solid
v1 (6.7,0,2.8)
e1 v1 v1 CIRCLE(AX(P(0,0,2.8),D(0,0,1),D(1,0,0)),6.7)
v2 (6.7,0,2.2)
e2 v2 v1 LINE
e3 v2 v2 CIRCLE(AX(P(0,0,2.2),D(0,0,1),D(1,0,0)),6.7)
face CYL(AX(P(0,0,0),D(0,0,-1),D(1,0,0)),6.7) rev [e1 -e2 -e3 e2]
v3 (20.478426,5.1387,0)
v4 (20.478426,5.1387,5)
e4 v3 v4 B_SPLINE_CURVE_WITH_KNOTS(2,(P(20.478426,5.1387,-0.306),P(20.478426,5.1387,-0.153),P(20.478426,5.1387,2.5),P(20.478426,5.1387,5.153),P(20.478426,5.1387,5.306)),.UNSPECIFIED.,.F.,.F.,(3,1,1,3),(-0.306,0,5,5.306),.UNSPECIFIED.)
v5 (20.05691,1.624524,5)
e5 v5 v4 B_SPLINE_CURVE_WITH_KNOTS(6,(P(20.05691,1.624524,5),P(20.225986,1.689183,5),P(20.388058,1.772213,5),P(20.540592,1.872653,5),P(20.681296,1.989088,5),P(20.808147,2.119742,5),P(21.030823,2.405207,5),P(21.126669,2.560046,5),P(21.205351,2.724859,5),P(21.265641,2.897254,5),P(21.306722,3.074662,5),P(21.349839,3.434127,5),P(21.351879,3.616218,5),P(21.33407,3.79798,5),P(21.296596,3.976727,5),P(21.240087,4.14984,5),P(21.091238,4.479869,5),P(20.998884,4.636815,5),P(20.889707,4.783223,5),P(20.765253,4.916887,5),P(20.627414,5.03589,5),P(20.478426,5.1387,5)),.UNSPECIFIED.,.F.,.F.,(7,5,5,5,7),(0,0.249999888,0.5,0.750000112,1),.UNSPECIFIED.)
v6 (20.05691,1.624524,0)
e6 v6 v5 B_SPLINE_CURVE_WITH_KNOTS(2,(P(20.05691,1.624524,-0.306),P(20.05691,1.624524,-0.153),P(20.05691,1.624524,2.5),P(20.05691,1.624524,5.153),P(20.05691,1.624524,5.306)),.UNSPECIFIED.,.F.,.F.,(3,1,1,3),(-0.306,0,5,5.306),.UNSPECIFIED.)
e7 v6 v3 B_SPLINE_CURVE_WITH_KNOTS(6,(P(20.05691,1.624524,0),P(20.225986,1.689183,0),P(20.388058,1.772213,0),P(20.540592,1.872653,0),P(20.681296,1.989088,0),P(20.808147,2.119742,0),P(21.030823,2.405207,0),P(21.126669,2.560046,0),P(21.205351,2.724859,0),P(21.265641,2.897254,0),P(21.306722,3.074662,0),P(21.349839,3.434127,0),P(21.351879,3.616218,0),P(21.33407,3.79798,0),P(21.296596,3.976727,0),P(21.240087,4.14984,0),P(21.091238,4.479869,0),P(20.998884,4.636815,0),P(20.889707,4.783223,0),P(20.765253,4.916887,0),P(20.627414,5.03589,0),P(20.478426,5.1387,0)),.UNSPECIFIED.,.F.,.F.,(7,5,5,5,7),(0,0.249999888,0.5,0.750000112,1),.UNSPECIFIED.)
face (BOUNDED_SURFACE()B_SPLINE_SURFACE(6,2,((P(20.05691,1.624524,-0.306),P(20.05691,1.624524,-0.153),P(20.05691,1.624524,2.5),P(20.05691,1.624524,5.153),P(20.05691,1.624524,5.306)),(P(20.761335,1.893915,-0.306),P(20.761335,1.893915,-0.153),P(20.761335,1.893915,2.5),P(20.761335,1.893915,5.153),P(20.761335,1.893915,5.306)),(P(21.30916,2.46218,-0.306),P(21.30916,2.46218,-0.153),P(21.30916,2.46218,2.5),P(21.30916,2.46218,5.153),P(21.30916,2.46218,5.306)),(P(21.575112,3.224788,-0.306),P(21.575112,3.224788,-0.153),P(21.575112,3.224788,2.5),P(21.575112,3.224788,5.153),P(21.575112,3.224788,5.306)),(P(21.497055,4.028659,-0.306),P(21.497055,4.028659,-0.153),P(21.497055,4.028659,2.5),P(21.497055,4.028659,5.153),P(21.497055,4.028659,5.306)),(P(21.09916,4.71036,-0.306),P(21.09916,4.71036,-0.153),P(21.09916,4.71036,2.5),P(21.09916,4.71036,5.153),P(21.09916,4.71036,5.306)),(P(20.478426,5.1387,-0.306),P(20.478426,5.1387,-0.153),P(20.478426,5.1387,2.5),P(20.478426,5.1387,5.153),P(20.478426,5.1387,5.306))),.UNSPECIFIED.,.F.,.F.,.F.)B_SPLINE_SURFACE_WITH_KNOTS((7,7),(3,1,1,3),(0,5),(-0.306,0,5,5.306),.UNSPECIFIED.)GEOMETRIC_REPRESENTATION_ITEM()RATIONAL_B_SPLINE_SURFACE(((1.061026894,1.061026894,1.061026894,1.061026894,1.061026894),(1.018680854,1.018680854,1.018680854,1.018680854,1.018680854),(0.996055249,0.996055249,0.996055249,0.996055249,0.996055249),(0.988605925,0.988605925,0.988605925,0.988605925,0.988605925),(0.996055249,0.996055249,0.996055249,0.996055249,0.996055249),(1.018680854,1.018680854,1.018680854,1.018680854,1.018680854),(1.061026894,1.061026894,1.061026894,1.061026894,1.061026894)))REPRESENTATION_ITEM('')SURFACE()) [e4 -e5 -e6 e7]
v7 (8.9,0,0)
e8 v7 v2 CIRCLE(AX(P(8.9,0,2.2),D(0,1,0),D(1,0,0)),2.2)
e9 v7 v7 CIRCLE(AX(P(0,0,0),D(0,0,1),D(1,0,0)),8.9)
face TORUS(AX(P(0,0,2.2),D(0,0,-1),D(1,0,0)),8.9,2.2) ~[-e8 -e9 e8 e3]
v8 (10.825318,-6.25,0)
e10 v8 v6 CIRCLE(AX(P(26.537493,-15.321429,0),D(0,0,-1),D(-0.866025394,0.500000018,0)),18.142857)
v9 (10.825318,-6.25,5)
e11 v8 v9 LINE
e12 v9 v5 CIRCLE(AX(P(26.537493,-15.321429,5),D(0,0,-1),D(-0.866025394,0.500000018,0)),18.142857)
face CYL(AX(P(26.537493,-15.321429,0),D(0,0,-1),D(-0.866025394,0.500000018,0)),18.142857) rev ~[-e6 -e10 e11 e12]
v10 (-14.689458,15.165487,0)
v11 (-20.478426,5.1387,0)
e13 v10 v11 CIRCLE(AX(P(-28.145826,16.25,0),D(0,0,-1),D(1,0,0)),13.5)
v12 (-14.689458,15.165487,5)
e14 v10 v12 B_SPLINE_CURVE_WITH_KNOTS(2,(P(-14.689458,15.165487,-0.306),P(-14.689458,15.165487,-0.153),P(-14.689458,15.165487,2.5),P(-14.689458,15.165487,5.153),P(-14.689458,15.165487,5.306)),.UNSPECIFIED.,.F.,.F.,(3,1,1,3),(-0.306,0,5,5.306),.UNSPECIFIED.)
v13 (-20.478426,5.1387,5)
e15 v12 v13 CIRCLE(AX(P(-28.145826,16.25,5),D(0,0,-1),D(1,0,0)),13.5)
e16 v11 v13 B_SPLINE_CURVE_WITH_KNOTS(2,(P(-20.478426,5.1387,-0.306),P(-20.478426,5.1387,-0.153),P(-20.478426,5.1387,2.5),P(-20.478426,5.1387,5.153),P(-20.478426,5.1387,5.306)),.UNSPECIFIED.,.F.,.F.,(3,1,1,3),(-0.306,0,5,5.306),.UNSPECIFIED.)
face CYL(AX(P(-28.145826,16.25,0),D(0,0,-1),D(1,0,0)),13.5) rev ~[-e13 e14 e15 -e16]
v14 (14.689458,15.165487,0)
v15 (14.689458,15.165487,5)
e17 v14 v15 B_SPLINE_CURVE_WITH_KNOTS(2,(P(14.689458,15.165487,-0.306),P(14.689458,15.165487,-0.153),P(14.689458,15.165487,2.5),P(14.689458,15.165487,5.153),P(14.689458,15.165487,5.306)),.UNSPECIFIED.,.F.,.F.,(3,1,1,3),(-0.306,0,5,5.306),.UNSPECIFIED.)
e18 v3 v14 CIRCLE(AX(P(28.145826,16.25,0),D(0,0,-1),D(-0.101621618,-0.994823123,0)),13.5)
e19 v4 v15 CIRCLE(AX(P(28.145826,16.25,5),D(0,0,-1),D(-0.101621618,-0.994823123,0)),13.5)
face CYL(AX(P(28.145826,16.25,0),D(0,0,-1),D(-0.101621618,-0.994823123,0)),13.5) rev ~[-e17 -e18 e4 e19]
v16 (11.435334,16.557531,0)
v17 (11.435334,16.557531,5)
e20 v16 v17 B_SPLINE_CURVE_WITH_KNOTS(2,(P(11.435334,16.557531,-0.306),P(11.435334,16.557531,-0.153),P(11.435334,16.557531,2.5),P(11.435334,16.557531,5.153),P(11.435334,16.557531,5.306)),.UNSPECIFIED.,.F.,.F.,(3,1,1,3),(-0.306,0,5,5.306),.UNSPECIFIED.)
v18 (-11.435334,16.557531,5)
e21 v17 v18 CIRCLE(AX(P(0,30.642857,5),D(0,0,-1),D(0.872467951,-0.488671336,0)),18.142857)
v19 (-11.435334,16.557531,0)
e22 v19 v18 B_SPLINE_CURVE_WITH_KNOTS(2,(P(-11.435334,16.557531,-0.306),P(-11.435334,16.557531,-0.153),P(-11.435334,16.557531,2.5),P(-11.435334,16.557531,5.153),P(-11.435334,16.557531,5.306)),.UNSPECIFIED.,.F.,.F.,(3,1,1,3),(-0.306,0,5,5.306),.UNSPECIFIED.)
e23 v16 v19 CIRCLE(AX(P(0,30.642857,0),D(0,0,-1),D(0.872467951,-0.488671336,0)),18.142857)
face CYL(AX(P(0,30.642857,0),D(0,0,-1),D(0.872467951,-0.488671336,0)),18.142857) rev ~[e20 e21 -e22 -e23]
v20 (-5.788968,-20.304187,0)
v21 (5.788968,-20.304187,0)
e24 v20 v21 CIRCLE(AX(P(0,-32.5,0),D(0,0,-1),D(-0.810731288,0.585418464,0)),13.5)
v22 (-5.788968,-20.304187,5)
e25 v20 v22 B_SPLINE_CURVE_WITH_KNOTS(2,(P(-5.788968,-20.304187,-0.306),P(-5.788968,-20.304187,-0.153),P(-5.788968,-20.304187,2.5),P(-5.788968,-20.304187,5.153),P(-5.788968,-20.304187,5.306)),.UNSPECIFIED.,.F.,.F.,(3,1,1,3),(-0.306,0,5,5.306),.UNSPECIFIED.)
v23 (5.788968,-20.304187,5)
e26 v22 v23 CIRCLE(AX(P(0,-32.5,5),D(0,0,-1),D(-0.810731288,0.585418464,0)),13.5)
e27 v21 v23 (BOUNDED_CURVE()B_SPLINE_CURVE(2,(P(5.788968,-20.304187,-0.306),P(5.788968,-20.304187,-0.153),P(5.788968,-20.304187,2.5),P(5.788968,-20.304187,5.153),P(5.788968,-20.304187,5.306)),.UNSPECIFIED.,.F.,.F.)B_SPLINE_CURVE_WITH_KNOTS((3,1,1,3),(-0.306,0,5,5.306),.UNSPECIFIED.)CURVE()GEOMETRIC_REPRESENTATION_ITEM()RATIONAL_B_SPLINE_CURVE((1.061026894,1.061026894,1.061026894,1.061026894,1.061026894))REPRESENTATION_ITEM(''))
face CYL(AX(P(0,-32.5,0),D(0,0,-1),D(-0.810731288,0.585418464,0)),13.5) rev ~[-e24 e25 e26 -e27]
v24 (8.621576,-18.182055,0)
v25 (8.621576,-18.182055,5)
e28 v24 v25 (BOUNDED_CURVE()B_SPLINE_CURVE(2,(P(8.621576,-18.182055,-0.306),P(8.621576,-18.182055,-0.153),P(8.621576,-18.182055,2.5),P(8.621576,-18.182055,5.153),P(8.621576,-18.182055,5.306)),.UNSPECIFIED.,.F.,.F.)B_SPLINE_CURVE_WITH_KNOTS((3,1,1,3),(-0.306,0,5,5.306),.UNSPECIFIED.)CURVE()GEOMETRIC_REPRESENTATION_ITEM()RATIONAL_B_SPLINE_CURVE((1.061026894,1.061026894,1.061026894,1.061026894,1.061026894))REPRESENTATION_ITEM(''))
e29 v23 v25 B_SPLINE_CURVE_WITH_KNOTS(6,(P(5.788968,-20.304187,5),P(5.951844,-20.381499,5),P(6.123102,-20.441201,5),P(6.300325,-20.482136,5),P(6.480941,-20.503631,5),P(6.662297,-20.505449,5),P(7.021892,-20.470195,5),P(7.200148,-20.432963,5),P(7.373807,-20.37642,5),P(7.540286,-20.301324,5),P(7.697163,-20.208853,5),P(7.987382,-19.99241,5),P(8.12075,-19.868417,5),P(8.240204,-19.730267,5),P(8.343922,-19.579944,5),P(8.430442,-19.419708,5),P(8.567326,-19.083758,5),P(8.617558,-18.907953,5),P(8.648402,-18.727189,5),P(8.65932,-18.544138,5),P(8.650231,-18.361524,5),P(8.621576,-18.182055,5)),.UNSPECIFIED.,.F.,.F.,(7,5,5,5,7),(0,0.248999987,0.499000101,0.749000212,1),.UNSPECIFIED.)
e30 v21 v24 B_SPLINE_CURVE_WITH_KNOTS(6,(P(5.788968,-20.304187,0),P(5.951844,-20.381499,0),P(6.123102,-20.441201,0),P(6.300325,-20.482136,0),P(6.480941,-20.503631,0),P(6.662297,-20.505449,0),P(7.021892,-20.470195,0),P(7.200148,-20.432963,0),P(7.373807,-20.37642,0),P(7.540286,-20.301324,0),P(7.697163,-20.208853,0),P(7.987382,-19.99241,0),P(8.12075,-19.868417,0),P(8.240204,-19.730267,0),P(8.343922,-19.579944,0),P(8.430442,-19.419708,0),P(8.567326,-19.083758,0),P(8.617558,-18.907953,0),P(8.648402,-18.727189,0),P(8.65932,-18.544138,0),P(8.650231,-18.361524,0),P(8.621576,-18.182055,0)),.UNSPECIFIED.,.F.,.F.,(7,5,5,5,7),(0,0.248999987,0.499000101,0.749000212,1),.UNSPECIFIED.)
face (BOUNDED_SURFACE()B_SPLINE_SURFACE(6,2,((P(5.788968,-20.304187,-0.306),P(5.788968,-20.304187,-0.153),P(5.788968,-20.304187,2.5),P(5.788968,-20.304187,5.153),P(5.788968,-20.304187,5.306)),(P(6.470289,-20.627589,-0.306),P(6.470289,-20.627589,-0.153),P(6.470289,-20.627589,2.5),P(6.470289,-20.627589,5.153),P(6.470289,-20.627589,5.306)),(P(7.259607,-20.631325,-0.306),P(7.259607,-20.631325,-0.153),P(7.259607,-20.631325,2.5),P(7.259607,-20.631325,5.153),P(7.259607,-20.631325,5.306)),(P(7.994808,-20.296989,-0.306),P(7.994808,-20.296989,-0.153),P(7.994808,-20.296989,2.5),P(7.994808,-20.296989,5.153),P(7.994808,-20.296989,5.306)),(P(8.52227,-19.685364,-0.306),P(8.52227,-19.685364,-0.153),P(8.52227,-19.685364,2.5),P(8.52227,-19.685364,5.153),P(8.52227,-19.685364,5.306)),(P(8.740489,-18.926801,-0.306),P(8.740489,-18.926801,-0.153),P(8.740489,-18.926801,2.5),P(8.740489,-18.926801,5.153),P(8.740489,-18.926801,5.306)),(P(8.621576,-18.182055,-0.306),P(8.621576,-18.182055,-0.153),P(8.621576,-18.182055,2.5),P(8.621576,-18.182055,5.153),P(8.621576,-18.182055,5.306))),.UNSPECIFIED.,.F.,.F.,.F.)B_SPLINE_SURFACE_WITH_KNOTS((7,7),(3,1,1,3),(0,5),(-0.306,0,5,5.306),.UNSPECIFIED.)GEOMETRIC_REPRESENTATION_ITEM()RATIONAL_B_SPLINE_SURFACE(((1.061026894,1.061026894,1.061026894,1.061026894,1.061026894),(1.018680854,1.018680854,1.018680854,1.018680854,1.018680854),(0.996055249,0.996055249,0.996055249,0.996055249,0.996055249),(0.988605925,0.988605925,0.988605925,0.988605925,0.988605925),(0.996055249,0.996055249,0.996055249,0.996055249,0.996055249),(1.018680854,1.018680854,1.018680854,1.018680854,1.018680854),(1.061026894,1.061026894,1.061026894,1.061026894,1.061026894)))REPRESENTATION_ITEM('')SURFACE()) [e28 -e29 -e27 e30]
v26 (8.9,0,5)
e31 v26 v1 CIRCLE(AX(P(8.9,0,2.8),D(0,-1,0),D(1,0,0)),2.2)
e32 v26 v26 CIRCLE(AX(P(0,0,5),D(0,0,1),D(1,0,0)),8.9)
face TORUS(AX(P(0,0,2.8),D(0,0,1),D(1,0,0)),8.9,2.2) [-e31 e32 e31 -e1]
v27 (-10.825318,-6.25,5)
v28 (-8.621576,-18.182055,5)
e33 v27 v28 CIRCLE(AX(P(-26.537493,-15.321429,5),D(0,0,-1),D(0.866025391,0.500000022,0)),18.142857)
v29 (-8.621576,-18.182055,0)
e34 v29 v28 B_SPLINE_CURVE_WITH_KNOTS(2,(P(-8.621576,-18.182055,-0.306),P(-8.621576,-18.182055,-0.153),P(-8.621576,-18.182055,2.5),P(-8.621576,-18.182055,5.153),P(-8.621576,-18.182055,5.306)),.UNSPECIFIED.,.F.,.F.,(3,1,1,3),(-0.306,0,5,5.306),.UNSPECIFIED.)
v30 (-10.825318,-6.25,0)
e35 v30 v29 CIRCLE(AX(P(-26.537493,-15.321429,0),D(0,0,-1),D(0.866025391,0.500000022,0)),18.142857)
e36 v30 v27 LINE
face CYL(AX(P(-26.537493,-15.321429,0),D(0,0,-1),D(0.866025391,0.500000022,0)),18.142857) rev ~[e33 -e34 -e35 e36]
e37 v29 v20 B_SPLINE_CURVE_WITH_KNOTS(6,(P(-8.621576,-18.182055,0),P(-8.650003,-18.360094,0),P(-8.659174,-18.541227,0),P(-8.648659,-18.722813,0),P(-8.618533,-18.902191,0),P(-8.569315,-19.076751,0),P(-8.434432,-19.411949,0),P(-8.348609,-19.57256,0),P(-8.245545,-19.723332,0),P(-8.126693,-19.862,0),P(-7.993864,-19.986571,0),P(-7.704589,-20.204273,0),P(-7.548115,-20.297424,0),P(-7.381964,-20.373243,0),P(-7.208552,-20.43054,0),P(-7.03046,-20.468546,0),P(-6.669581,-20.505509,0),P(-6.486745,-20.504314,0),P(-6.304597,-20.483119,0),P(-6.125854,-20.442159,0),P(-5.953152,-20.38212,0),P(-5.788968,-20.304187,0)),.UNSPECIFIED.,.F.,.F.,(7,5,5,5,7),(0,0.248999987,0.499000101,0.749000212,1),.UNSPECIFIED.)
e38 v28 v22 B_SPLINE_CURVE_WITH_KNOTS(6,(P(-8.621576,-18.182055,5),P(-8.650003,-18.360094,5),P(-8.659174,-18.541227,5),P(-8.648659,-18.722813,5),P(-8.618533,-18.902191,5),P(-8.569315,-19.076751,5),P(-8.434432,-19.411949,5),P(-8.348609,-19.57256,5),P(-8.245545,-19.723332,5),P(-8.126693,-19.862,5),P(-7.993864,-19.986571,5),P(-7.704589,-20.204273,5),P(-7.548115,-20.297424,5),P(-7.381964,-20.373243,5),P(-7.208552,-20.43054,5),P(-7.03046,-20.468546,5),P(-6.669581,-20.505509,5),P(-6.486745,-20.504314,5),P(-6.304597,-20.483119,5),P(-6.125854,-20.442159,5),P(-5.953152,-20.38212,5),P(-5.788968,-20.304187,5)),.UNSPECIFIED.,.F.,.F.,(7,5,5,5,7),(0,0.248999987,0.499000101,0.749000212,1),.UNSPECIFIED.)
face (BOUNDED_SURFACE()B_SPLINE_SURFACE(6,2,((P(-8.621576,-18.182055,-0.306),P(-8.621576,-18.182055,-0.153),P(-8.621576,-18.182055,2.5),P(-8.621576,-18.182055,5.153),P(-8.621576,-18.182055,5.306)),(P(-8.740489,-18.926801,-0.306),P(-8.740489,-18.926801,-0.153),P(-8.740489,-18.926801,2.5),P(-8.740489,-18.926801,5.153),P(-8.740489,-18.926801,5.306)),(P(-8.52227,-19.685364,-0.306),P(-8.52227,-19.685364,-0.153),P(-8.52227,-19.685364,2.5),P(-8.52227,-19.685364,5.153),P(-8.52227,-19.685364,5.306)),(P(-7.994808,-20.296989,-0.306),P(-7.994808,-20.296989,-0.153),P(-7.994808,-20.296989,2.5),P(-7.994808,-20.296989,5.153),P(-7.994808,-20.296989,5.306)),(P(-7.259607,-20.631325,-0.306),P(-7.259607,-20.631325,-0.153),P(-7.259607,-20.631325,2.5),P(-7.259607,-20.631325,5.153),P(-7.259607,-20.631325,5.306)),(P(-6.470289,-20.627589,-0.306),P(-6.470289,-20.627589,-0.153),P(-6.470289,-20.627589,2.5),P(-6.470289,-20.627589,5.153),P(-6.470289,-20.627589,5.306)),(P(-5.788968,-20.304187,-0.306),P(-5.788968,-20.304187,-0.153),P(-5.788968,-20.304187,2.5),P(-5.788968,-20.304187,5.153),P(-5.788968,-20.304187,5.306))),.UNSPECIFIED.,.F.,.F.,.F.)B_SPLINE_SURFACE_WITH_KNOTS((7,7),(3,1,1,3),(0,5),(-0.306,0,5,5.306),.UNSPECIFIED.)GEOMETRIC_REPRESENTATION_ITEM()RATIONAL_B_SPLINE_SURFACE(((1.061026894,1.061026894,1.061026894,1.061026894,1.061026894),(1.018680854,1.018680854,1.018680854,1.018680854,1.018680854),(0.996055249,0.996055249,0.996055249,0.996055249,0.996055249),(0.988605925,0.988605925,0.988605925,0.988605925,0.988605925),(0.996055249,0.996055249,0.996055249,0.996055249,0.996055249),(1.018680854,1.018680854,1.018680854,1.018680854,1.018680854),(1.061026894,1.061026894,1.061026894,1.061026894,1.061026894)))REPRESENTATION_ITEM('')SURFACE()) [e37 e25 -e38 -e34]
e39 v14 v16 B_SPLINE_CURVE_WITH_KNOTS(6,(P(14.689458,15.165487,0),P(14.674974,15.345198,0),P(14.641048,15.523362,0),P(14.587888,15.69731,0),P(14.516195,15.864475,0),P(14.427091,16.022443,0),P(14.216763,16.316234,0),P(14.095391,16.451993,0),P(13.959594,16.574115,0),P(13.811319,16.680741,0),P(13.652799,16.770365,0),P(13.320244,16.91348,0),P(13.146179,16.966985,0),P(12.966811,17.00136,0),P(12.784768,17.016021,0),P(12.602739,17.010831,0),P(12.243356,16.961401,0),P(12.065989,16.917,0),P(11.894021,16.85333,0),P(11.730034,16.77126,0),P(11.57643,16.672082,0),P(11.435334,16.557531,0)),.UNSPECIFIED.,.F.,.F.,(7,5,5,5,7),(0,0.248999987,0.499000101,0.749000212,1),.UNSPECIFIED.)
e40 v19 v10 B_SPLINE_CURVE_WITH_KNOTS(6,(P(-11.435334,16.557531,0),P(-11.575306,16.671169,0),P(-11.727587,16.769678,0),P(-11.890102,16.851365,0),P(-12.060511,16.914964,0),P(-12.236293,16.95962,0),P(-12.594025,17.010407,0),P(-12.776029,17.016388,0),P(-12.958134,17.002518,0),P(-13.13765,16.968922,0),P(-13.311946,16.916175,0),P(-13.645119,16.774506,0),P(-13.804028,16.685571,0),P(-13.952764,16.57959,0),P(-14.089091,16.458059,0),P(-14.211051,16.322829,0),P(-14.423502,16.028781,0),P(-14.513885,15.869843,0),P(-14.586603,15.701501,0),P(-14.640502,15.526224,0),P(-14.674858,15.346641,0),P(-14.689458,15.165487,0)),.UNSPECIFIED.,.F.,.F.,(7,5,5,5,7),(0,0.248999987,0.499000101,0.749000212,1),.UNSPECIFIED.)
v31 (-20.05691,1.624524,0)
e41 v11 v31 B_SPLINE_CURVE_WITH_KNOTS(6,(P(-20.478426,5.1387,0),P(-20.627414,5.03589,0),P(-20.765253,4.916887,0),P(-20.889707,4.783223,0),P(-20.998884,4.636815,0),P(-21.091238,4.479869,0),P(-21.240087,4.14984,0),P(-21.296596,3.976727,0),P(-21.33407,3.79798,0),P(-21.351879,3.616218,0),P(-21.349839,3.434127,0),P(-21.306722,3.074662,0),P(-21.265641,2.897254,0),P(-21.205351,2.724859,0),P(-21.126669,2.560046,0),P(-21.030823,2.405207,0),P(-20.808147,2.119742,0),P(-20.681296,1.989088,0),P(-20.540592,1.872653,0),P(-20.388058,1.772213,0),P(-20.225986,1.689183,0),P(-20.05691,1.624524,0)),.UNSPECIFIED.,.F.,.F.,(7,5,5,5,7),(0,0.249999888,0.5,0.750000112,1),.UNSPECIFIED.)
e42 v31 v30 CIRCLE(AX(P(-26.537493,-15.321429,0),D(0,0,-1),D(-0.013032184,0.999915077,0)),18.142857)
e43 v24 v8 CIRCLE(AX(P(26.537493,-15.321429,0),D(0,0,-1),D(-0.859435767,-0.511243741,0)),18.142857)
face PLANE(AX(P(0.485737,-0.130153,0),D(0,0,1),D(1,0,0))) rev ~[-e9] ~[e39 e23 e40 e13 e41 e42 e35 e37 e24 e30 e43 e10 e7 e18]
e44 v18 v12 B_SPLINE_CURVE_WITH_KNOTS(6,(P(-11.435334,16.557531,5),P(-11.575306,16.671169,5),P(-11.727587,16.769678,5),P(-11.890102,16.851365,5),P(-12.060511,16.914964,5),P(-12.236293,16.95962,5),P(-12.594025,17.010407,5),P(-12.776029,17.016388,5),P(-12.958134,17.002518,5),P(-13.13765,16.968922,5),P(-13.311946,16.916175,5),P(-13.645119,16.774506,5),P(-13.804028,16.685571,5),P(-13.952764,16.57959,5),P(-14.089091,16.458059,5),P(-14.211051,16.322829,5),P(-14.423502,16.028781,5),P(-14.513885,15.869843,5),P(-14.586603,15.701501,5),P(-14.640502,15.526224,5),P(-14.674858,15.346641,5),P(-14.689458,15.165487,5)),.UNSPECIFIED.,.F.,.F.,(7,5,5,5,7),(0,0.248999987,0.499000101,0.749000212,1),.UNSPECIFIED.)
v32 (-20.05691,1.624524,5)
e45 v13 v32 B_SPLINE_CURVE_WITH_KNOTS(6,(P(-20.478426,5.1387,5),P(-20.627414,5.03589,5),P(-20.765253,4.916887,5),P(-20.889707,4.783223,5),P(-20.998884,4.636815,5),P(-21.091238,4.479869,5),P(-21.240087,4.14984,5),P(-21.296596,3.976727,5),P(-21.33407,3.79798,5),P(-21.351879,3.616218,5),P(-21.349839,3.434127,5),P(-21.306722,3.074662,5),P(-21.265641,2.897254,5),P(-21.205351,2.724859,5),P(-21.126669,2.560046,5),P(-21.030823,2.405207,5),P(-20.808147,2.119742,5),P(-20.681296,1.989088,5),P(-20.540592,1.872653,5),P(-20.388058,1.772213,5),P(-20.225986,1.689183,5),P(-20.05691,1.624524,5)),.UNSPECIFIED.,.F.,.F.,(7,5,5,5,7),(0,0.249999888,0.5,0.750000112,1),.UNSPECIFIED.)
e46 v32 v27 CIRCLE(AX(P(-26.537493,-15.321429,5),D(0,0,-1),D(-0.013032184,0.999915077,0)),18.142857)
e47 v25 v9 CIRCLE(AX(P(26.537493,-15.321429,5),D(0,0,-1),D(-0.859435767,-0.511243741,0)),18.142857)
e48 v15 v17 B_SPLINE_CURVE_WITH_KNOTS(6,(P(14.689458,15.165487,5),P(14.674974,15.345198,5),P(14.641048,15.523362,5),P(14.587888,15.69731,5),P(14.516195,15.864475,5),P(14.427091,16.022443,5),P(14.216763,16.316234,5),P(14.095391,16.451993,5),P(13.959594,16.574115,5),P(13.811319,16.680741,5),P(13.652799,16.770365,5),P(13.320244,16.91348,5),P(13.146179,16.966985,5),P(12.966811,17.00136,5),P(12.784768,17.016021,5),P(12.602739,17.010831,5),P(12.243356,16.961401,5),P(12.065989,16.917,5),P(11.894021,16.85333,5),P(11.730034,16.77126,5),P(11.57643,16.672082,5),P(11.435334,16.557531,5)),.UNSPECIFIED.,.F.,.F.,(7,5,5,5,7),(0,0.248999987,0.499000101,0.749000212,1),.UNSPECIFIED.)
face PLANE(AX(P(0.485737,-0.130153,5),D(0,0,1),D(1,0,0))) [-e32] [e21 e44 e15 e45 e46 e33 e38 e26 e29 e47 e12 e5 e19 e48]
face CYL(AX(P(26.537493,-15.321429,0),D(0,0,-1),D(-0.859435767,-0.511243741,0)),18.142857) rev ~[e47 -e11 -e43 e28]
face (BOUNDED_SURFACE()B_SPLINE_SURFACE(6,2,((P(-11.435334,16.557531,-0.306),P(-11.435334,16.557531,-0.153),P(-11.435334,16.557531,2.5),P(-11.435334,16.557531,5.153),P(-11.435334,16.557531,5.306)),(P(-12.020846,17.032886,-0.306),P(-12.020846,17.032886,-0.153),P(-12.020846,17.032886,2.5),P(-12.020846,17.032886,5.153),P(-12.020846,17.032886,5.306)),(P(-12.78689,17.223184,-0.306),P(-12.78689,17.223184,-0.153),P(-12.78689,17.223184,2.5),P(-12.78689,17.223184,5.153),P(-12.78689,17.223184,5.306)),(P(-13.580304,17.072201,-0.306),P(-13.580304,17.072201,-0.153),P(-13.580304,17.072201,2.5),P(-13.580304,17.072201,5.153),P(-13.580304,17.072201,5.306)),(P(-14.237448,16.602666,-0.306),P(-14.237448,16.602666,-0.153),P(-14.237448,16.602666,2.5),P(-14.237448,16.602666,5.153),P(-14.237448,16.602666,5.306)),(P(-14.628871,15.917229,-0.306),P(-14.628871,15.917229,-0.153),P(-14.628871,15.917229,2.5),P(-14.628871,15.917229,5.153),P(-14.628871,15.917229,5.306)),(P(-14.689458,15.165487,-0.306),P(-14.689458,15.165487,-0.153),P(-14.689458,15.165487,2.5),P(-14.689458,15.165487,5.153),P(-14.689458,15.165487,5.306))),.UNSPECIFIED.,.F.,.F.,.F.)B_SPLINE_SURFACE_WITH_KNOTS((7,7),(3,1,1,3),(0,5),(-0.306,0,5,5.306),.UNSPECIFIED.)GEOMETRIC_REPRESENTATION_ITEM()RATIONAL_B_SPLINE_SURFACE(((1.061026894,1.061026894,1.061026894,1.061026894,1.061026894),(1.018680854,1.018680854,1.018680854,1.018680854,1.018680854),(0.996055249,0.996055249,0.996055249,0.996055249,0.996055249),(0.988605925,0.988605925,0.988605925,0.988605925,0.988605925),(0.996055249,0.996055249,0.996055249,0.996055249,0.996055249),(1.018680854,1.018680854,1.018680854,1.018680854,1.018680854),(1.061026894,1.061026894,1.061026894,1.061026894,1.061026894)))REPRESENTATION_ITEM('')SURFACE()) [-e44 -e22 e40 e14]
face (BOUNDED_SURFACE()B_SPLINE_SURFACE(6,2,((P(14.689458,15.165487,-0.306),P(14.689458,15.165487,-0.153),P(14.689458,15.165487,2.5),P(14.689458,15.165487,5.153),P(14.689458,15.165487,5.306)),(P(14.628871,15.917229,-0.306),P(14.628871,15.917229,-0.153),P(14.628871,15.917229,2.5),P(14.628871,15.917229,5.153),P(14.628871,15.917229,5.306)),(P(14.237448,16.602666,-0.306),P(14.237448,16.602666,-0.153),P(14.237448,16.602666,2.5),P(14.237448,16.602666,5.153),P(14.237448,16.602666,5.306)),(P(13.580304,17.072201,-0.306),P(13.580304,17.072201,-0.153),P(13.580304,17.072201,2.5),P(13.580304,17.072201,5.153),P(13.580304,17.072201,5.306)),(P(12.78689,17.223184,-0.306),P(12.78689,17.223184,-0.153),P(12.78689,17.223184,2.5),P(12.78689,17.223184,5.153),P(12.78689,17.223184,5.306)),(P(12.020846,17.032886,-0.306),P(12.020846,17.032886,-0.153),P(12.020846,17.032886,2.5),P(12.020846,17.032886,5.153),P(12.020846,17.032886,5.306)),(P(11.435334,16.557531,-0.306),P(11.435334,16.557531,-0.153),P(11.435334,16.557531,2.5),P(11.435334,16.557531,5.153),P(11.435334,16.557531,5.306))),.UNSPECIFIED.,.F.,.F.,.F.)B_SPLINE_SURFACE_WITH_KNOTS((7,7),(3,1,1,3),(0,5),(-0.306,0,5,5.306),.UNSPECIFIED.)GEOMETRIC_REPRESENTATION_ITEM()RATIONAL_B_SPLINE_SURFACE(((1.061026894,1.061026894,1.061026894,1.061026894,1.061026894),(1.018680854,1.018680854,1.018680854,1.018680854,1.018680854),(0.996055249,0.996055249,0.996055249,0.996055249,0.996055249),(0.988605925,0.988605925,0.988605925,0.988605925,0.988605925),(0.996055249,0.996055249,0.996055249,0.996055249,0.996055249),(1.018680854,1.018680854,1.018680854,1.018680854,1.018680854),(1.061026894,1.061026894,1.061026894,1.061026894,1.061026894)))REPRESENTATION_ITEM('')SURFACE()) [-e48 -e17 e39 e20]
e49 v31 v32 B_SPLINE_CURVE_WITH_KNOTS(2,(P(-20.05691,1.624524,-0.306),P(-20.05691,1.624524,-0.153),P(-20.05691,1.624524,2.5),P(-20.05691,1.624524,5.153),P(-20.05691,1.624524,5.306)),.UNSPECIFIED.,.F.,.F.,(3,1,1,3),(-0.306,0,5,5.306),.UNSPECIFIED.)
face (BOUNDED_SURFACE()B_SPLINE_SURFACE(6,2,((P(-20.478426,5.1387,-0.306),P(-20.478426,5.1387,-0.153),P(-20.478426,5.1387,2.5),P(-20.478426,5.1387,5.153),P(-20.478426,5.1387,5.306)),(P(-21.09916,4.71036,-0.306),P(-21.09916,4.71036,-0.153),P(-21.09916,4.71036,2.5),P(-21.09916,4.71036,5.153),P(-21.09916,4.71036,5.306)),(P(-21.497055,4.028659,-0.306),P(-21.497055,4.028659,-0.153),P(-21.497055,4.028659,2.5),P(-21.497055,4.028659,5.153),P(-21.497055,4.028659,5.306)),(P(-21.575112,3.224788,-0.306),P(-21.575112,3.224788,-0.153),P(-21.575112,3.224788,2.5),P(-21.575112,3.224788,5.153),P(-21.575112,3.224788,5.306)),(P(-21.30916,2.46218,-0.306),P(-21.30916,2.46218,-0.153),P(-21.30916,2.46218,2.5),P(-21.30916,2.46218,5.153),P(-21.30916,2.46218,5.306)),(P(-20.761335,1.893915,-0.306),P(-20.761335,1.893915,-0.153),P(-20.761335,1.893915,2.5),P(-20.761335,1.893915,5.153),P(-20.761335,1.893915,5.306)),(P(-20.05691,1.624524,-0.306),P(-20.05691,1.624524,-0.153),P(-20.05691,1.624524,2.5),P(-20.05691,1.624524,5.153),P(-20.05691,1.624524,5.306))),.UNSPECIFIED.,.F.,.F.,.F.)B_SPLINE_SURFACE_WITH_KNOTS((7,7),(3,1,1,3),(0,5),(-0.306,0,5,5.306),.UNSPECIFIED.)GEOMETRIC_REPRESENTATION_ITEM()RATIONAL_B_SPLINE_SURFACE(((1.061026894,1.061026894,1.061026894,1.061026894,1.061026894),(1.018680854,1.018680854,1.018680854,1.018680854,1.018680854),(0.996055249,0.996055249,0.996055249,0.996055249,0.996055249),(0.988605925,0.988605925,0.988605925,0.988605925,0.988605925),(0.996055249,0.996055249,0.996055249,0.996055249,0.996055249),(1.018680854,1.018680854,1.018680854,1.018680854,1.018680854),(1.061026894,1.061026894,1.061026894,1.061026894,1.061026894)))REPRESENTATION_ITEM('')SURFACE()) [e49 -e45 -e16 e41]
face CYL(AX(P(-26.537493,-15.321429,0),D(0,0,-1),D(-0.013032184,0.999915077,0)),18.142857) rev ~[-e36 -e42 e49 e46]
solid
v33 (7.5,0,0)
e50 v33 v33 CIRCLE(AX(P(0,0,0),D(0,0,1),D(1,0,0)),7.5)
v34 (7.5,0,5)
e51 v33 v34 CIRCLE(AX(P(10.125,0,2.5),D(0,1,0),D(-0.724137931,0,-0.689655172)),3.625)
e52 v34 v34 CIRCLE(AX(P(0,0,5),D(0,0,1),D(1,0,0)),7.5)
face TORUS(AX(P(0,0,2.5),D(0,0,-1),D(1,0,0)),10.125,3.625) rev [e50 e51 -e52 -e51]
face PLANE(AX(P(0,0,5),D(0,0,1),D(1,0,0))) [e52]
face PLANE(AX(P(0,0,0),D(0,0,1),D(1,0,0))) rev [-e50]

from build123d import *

# Parameters (mm, degrees)
F0_R     = 7.5
F0_R_2   = 6.7
F1_DEPTH = 5
F2_R     = 2
F3_R     = 2.2


# Not quite as in the source:
# - a feature names something its author has since deleted; it is built from what else it names


with BuildPart() as f1:
    # F0 (on Top) → F1 (new body)
    with BuildSketch(Plane.XY):
        with BuildLine():
            ThreePointArc((12.5, 0), (8.8388347698, 8.8388347598), (1.42e-08, 12.5))
            ThreePointArc((1.42e-08, 12.5), (-10.8253174308, 6.2500002019), (-10.8253177733, -6.2499996085))
            ThreePointArc((-10.8253177733, -6.2499996085), (-4.25e-08, -12.5), (10.8253177308, -6.2499996822))
            ThreePointArc((10.8253177308, -6.2499996822), (12.0740728761, -3.2352378865), (12.5, 0))
        make_face()
        Circle(F0_R, mode=Mode.SUBTRACT)
        Circle(F0_R)
        Circle(F0_R_2, mode=Mode.SUBTRACT)
        with BuildLine():
            ThreePointArc((26.773933784, 2.8198878343), (16.4544826719, 9.5), (15.8290613924, 21.776962899))
            ThreePointArc((15.8290613924, 21.776962899), (9.1736201366, 14.9901270648), (1.42e-08, 12.5))
            ThreePointArc((1.42e-08, 12.5), (8.8388347698, 8.8388347598), (12.5, 0))
            ThreePointArc((12.5, 0), (12.0740728761, -3.2352378865), (10.8253177308, -6.2499996822))
            ThreePointArc((10.8253177308, -6.2499996822), (17.5686410658, 0.4495246378), (26.773933784, 2.8198878343))
        make_face()
        with BuildLine():
            ThreePointArc((-10.8253177733, -6.2499996085), (-10.8253174308, 6.2500002019), (1.42e-08, 12.5))
            ThreePointArc((1.42e-08, 12.5), (-9.1736201244, 14.9901270577), (-15.8290613924, 21.7769628991))
            ThreePointArc((-15.8290613924, 21.7769628991), (-14.9449484341, 19.0761000413), (-14.645825623, 16.25))
            ThreePointArc((-14.645825623, 16.25), (-18.1265806458, 7.2020869762), (-26.773933784, 2.8198878343))
            ThreePointArc((-26.773933784, 2.8198878343), (-17.5686411027, 0.4495246588), (-10.8253177733, -6.2499996085))
        make_face()
        with BuildLine():
            ThreePointArc((10.9448723917, -24.5968507334), (8.3950207746, -15.4396514248), (10.8253177308, -6.2499996822))
            ThreePointArc((10.8253177308, -6.2499996822), (-4.25e-08, -12.5), (-10.8253177733, -6.2499996085))
            ThreePointArc((-10.8253177733, -6.2499996085), (-8.3950207743, -15.4396513823), (-10.9448723917, -24.5968507334))
            ThreePointArc((-10.9448723917, -24.5968507334), (0, -19), (10.9448723917, -24.5968507334))
        make_face()
    extrude(amount=F1_DEPTH)

    # F2
    f2_edges = [f1.edges().sort_by_distance(p)[0] for p in [
        (10.944872, -24.596851, 2.5),
        (-10.944872, -24.596851, 2.5),
        (26.773934, 2.819888, 2.5),
        (15.829061, 21.776963, 2.5),
        (-26.773934, 2.819888, 2.5),
        (-15.829061, 21.776963, 2.5),
    ]]
    fillet(f2_edges, radius=F2_R)

    # F3
    f3_edges = [f1.edges().sort_by_distance(p)[0] for p in [
        (-6.7, 0, 5),
        (-6.7, 0, 0),
    ]]
    fillet(f3_edges, radius=F3_R)


with BuildPart() as f5:
    # F4 (on Front) → F5 (revolve)
    with BuildSketch(Plane.XZ):
        with BuildLine():
            Line((7.5, 5), (0, 5))
            Line((0, 5), (0, 0))
            Line((0, 0), (7.5, 0))
            ThreePointArc((7.5, 0), (6.5, 2.5), (7.5, 5))
        make_face()
    revolve(axis=Axis((0, 0, 5.3585310292), (0, 0, 1)))


solid = Compound([f1.part, f5.part])
